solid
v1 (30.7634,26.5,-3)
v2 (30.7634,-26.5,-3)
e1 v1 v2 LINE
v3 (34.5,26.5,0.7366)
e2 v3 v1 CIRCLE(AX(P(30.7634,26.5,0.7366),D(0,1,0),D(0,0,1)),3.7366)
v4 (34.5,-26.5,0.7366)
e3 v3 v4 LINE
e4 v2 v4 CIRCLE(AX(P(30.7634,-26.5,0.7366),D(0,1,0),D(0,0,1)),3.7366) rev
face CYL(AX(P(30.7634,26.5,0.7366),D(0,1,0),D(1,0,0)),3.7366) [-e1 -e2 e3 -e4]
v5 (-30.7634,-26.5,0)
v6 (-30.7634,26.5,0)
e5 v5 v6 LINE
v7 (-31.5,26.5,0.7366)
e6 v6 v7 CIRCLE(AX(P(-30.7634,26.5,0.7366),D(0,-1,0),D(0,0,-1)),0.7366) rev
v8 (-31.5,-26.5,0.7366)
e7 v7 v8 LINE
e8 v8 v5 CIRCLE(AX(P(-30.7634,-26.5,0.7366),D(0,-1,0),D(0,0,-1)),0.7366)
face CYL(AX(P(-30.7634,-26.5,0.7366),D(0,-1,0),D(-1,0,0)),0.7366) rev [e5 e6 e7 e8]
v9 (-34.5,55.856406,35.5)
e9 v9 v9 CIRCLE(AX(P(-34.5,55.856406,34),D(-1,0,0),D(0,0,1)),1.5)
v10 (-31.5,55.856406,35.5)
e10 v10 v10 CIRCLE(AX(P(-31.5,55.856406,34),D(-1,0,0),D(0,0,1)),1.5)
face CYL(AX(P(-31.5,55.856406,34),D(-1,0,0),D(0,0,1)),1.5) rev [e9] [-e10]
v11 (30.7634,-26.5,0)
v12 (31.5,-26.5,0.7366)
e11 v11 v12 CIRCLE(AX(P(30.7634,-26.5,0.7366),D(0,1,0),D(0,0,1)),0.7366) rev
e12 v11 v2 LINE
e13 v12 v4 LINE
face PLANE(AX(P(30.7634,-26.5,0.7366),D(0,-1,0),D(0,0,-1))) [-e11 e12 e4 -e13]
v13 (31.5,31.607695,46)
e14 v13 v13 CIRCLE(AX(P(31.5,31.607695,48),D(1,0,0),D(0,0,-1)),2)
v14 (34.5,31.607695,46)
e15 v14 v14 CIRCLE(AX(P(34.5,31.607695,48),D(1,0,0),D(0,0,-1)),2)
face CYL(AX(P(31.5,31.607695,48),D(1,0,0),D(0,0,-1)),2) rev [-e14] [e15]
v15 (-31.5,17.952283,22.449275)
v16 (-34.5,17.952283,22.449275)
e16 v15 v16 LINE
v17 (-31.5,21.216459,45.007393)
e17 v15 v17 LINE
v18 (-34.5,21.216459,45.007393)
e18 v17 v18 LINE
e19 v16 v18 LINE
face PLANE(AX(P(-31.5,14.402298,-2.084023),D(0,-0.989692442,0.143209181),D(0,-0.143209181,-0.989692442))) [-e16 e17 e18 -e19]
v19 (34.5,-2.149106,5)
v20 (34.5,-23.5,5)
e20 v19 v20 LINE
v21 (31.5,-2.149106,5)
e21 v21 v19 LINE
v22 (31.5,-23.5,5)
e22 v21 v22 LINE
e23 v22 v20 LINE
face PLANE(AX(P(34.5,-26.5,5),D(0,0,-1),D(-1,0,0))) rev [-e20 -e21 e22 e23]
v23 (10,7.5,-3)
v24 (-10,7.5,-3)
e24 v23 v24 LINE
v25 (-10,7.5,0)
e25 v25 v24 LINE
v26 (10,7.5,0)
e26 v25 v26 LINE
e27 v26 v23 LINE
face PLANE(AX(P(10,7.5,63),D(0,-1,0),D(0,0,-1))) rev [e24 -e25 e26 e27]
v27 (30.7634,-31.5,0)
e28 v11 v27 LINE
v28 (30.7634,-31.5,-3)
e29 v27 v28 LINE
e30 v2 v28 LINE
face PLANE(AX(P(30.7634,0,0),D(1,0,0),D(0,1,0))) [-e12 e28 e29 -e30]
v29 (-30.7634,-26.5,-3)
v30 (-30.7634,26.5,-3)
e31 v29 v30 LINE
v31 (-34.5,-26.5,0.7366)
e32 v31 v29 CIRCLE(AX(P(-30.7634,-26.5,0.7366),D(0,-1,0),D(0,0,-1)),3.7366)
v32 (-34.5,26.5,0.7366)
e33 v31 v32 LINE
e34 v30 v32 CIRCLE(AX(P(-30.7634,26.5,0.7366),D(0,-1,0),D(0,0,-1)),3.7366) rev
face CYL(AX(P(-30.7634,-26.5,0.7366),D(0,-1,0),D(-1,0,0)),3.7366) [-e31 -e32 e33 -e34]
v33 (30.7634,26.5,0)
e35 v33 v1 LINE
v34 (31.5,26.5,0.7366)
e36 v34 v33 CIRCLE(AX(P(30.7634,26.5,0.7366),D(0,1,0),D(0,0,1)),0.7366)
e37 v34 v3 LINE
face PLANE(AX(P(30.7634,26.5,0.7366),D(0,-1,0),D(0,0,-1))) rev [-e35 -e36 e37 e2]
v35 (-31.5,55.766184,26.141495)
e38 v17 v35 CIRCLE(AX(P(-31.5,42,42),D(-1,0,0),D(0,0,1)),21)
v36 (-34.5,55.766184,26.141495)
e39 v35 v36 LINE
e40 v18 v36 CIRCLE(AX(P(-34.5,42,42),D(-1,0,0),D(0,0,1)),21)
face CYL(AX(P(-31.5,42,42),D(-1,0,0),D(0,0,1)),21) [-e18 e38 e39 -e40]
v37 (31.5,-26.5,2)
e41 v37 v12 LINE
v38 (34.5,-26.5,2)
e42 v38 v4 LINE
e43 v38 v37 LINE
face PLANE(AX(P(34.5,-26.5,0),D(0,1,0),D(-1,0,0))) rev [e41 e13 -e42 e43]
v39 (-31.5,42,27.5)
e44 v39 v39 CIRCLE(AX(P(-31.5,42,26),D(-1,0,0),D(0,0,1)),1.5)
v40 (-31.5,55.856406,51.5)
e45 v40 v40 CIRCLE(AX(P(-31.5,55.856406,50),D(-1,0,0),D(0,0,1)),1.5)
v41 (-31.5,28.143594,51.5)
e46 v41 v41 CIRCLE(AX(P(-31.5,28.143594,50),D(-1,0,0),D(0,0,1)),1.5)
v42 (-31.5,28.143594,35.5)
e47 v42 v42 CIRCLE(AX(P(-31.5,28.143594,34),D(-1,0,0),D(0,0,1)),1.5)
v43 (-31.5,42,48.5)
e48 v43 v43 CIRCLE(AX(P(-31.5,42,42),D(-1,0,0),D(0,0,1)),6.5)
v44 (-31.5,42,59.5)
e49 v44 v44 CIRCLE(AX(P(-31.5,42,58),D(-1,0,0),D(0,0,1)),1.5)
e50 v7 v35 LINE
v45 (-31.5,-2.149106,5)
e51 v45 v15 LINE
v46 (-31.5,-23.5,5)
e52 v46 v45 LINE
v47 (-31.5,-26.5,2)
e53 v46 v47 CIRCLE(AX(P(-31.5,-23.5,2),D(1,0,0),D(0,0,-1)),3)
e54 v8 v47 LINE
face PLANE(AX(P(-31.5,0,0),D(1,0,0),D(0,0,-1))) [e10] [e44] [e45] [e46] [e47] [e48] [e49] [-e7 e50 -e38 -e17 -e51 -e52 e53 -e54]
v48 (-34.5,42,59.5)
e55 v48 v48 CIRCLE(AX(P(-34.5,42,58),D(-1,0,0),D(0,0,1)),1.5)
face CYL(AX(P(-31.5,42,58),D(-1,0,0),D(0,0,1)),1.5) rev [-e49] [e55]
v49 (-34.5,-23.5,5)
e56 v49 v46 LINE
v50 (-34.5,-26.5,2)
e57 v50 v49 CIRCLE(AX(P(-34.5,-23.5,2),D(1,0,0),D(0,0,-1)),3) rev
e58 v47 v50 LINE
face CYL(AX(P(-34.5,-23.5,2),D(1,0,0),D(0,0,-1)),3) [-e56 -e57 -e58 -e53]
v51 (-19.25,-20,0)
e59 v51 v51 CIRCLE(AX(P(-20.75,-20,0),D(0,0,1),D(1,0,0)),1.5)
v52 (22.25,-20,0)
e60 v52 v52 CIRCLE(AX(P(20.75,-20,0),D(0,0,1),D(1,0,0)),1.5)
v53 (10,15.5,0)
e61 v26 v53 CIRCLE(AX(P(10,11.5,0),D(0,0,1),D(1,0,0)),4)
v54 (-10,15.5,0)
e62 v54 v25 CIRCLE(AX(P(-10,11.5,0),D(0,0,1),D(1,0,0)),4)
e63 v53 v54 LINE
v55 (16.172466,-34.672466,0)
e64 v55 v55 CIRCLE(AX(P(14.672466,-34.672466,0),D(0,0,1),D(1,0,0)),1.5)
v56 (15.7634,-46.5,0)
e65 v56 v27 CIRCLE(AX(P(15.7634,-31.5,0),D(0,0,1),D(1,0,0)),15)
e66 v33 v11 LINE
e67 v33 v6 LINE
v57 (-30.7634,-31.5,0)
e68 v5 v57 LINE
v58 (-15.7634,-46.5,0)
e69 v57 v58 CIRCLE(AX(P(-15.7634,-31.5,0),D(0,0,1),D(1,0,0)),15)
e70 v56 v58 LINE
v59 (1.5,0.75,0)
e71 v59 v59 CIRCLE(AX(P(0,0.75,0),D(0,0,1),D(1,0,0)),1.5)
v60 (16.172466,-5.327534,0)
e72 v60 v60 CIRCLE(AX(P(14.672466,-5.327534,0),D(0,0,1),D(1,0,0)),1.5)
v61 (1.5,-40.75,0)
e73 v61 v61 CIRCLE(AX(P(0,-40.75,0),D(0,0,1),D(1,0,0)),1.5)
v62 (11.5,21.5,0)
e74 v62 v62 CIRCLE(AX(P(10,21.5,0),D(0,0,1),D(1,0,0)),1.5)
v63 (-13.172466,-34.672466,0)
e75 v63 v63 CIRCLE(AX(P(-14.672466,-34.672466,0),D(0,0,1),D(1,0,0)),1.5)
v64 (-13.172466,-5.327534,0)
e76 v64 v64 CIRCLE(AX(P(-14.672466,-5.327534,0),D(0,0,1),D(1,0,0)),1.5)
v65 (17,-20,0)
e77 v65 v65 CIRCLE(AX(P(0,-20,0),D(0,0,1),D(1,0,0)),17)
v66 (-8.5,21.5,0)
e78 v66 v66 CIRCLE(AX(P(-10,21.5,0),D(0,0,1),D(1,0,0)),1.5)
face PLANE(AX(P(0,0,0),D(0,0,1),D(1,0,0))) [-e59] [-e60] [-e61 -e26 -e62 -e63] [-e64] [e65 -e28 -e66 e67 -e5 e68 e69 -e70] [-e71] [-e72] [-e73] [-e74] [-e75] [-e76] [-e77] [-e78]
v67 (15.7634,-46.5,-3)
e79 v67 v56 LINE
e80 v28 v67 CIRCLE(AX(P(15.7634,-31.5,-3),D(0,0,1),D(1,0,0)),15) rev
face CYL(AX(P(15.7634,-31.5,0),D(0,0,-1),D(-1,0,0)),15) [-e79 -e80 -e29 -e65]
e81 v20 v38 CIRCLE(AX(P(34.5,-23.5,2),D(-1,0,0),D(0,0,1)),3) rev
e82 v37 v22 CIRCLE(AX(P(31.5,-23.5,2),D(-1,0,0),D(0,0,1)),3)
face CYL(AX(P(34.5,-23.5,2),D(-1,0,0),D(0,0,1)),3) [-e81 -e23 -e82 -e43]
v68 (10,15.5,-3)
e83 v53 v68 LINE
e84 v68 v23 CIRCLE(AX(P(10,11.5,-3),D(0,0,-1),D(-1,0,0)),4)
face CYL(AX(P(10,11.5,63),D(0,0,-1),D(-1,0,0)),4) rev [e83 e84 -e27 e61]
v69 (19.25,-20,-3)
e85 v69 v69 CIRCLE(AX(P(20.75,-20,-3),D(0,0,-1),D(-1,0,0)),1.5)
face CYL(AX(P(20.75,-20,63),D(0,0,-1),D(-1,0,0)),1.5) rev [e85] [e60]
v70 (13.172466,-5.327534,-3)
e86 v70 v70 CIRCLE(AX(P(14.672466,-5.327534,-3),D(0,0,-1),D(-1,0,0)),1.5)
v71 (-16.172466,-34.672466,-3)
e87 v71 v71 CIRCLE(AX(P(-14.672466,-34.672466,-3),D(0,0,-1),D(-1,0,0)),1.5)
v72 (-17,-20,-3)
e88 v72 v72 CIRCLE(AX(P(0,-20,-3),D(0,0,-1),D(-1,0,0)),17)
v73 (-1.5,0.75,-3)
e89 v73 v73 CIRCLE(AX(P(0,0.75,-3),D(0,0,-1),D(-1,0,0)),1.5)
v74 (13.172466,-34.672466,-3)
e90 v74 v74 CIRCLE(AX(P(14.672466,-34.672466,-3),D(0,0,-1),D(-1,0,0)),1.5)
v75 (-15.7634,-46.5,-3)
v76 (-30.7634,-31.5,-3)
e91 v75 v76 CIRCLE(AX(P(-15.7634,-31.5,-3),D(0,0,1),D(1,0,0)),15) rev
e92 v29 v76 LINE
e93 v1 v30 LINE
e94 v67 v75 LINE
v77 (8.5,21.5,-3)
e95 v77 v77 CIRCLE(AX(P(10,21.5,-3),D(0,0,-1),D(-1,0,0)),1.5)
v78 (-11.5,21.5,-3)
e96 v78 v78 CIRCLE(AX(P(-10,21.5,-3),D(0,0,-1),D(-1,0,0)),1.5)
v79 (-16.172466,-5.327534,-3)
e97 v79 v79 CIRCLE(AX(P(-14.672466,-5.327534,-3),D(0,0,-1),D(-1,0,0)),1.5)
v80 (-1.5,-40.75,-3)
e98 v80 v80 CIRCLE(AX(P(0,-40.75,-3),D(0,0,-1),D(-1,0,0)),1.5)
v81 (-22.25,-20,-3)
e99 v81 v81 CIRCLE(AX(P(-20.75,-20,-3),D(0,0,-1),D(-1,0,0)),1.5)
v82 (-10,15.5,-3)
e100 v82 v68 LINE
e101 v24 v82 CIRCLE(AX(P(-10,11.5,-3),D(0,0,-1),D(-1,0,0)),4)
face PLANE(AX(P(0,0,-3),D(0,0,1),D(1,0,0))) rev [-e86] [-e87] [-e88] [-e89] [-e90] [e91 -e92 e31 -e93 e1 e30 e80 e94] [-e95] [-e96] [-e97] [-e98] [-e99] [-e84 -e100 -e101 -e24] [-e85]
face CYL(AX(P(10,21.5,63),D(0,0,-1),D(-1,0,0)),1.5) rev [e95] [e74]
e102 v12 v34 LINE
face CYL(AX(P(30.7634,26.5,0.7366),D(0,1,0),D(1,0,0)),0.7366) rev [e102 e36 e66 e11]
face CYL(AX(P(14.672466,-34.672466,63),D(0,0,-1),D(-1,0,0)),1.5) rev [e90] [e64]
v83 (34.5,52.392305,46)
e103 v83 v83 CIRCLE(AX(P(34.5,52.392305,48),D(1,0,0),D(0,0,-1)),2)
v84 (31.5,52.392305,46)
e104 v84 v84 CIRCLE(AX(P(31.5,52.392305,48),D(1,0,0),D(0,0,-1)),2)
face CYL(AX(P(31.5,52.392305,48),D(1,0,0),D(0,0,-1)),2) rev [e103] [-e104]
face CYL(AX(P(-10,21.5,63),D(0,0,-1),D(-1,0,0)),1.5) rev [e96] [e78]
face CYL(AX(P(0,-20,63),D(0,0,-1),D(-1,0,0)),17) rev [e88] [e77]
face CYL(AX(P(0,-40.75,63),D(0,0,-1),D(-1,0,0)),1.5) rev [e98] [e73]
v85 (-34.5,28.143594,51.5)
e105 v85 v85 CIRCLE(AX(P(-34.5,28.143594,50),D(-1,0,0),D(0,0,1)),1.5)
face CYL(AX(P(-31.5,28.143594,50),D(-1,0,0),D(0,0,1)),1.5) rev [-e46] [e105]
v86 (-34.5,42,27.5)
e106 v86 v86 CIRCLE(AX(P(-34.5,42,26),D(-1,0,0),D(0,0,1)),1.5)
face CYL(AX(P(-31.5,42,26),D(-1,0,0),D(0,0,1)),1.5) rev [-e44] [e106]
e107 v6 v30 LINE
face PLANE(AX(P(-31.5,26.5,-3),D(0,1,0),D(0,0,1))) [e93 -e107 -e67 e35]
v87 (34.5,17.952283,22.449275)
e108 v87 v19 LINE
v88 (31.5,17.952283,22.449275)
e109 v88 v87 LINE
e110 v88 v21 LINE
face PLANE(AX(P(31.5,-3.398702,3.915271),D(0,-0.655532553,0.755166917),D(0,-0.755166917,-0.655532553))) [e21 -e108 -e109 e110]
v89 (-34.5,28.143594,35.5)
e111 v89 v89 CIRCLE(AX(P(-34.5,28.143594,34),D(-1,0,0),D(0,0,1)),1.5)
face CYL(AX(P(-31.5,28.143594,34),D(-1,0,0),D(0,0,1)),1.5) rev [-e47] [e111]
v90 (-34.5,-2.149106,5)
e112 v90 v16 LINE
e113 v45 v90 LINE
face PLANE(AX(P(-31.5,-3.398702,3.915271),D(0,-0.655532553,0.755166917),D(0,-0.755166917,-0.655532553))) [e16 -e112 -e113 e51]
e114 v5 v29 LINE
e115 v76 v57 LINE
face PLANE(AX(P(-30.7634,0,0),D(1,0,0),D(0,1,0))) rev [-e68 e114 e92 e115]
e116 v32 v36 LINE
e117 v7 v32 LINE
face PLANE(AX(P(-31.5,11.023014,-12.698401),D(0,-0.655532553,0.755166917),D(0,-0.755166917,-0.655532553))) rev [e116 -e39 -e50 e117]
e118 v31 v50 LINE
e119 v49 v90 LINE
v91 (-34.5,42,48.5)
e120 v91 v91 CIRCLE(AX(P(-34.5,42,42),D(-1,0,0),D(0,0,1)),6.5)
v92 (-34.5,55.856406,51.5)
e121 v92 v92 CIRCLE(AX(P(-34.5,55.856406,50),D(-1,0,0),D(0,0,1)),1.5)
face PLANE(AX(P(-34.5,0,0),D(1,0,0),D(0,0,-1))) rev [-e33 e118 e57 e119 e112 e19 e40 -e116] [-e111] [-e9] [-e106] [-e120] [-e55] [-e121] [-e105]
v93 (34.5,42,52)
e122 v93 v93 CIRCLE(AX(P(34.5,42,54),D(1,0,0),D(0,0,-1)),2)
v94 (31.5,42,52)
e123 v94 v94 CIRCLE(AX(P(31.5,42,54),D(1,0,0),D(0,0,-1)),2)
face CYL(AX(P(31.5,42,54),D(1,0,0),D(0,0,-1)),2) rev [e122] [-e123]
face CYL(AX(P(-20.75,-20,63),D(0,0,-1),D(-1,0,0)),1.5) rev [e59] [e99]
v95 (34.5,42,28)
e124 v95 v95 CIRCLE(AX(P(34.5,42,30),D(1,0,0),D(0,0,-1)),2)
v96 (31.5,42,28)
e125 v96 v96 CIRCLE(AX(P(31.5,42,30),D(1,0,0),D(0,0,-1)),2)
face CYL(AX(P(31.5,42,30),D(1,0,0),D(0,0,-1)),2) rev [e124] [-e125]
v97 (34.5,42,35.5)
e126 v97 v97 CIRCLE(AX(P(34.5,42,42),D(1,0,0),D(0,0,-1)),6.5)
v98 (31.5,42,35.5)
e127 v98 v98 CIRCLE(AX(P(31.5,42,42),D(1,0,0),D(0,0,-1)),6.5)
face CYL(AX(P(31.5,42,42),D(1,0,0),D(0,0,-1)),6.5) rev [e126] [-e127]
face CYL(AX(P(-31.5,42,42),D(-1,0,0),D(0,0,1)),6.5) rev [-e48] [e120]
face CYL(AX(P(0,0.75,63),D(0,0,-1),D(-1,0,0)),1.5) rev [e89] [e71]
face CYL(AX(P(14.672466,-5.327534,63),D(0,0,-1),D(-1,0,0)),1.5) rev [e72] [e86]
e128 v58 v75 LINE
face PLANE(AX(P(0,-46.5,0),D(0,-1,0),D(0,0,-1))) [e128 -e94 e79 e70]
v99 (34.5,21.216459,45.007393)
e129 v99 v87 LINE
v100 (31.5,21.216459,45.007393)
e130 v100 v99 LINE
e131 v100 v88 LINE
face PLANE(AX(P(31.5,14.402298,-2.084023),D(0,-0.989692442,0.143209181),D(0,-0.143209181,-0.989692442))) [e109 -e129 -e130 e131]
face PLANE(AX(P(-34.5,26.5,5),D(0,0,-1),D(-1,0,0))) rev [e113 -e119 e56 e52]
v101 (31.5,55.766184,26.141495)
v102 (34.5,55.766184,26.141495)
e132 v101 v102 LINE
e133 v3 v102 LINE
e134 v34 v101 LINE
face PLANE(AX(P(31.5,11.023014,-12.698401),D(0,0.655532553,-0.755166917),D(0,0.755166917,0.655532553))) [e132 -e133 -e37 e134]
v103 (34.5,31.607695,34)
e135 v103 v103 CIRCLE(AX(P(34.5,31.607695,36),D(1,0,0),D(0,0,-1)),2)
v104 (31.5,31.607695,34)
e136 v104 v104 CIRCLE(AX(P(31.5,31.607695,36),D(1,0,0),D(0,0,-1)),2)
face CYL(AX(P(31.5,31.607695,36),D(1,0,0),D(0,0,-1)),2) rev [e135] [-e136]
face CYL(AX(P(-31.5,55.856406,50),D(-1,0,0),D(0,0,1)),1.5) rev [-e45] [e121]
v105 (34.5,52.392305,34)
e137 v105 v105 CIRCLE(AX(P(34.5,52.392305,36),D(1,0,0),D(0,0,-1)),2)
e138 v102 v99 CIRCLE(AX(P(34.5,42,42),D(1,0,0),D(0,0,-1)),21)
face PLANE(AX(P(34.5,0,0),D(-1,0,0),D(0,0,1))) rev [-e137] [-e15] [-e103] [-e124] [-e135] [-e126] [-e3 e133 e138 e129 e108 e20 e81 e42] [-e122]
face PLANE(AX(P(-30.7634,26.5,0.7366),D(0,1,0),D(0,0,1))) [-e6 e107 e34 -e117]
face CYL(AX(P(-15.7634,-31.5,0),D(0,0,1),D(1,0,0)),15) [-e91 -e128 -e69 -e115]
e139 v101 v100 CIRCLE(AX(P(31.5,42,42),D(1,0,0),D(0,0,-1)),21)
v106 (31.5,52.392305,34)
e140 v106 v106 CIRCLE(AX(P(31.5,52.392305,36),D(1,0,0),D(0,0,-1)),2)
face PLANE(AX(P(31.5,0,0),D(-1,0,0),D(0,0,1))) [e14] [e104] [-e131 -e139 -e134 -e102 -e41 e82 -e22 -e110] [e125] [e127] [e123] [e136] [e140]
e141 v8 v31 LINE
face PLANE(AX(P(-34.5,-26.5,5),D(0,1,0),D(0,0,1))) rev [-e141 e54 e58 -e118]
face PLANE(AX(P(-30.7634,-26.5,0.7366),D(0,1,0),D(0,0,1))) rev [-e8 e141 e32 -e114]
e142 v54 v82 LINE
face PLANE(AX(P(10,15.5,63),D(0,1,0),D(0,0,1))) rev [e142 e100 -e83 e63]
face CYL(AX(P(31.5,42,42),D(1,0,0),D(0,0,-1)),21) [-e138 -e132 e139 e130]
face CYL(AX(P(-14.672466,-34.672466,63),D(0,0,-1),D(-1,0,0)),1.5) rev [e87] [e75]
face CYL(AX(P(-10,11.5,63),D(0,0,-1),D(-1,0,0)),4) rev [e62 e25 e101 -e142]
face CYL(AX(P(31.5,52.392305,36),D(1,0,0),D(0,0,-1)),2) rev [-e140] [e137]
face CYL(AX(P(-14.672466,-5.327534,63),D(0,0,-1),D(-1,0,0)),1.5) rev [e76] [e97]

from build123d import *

# Parameters (mm, degrees)
SKETCH_1_W                         = 63
SKETCH_1_H                         = 53
SM_BASE_FLANGE_1_DEPTH             = 3
SM_EDGE_FLANGE_1_STRIP_W           = 13.4732
SM_EDGE_FLANGE_1_STRIP_H           = 3
SM_EDGE_FLANGE_1_STRIP_CUT_DEPTH   = 53
SM_EDGE_FLANGE_1_STRIP_2_W         = 13.4732
SM_EDGE_FLANGE_1_STRIP_2_H         = 3
SM_EDGE_FLANGE_1_STRIP_CUT_2_DEPTH = 53
SM_EDGE_FLANGE_1_DEPTH             = 53
SM_EDGE_FLANGE_1_BEND_DEPTH        = 53
SKETCH_16_R                        = 1.5
SKETCH_16_R_2                      = 6.5
EXTRUDE_1_DEPTH                    = 3
EXTRUDE_START                      = -3
SKETCH_21_R                        = 2
SKETCH_21_R_2                      = 6.5
EXTRUDE_5_DEPTH                    = 3
EXTRUDE_6_DEPTH                    = 3
SKETCH_23_W                        = 61.5268
SKETCH_23_H                        = 20
EXTRUDE_7_DEPTH                    = 3
SKETCH_17_R                        = 1.5
SKETCH_17_R_2                      = 17
CUT_EXTRUDE_1_DEPTH                = 98.546142927
FILLET_2_R                         = 15
FILLET_3_R                         = 3
SKETCH_24_R                        = 1.5
CUT_EXTRUDE_2_DEPTH                = 98.546142927


# Sheet-metal steps are written as plain solids
with BuildPart() as part:
    # Sketch 1 → 基体-法兰1 (new body)
    with BuildSketch(Plane.XY):
        Rectangle(SKETCH_1_W, SKETCH_1_H)
    extrude(amount=-SM_BASE_FLANGE_1_DEPTH)

    # 边线-法兰1 strip (across the edge) → 边线-法兰1 strip cut (cut)
    with BuildSketch(Plane(origin=(-31.5, 26.5, 0), x_dir=(1, 0, 0), z_dir=(0, -1, 0))):
        with Locations((-6, -1.5)):
            Rectangle(SM_EDGE_FLANGE_1_STRIP_W, SM_EDGE_FLANGE_1_STRIP_H)
    extrude(amount=SM_EDGE_FLANGE_1_STRIP_CUT_DEPTH, mode=Mode.SUBTRACT)

    # 边线-法兰1 strip 2 (across the edge) → 边线-法兰1 strip cut 2 (cut)
    with BuildSketch(Plane(origin=(31.5, -26.5, 0), x_dir=(-1, 0, 0), z_dir=(0, 1, 0))):
        with Locations((-6, -1.5)):
            Rectangle(SM_EDGE_FLANGE_1_STRIP_2_W, SM_EDGE_FLANGE_1_STRIP_2_H)
    extrude(amount=SM_EDGE_FLANGE_1_STRIP_CUT_2_DEPTH, mode=Mode.SUBTRACT)

    # 边线-法兰1 section (across the edge) → 边线-法兰1 (add)
    with BuildSketch(Plane(origin=(-31.5, 26.5, 0), x_dir=(1, 0, 0), z_dir=(0, -1, 0))):
        with BuildLine():
            Line((-3, 0.7366), (-3, 5))
            Line((-3, 5), (0, 5))
            Line((0, 5), (0, 0.7366))
            ThreePointArc((0, 0.7366), (0.215745145, 0.215745145), (0.7366, 0))
            Line((0.7366, 0), (0.7366, -3))
            ThreePointArc((0.7366, -3), (-1.905575199, -1.905575199), (-3, 0.7366))
        make_face()
    extrude(amount=SM_EDGE_FLANGE_1_DEPTH)

    # 边线-法兰1 section 2 (across the edge) → 边线-法兰1 bend (add)
    with BuildSketch(Plane(origin=(31.5, -26.5, 0), x_dir=(-1, 0, 0), z_dir=(0, 1, 0))):
        with BuildLine():
            Line((-3, 0.7366), (-3, 5))
            Line((-3, 5), (0, 5))
            Line((0, 5), (0, 0.7366))
            ThreePointArc((0, 0.7366), (0.215745145, 0.215745145), (0.7366, 0))
            Line((0.7366, 0), (0.7366, -3))
            ThreePointArc((0.7366, -3), (-1.905575199, -1.905575199), (-3, 0.7366))
        make_face()
    extrude(amount=SM_EDGE_FLANGE_1_BEND_DEPTH)

    # 草图16 → 凸台-拉伸1 (add)
    with BuildSketch(Plane.ZY.offset(34.5)):
        with BuildLine():
            Line((26.141494742, 55.766183603), (0.7366, 26.5))
            Line((0.7366, 26.5), (5, 26.5))
            Line((5, 26.5), (5, -2.149105668))
            Line((5, -2.149105668), (29.00460009, 25.503952559))
            ThreePointArc((29.00460009, 25.503952559), (62.906640519, 43.977974267), (26.141494742, 55.766183603))
        make_face()
        with Locations((50, 55.856406461)):
            Circle(SKETCH_16_R, mode=Mode.SUBTRACT)
        with Locations((26, 42)):
            Circle(SKETCH_16_R, mode=Mode.SUBTRACT)
        with Locations((34, 28.143593539)):
            Circle(SKETCH_16_R, mode=Mode.SUBTRACT)
        with Locations((50, 28.143593539)):
            Circle(SKETCH_16_R, mode=Mode.SUBTRACT)
        with Locations((42, 42)):
            Circle(SKETCH_16_R_2, mode=Mode.SUBTRACT)
        with Locations((34, 55.856406461)):
            Circle(SKETCH_16_R, mode=Mode.SUBTRACT)
        with Locations((58, 42)):
            Circle(SKETCH_16_R, mode=Mode.SUBTRACT)
    extrude(amount=-EXTRUDE_1_DEPTH)

    # 草图21 → 凸台-拉伸5 (add)
    # profile 1 of 2: a face of its own
    with BuildSketch(Plane(origin=(34.5, 0, 0), x_dir=(0, 0, -1), z_dir=(1, 0, 0)).offset(EXTRUDE_START)):
        with BuildLine():
            ThreePointArc((-26.141494742, 55.766183603), (-60.431186758, 52.06436062), (-45.007392809, 21.216458711))
            ThreePointArc((-45.007392809, 21.216458711), (-36.565322242, 21.715417735), (-29.00460009, 25.503952559))
            Line((-29.00460009, 25.503952559), (-22.449274565, 17.952283389))
            Line((-22.449274565, 17.952283389), (-5, -2.149105668))
            Line((-5, -2.149105668), (-5, 26.5))
            Line((-5, 26.5), (-0.7366, 26.5))
            Line((-0.7366, 26.5), (-26.141494742, 55.766183603))
        make_face()
        with Locations((-48, 31.607695155)):
            Circle(SKETCH_21_R, mode=Mode.SUBTRACT)
        with Locations((-36, 31.607695155)):
            Circle(SKETCH_21_R, mode=Mode.SUBTRACT)
        with Locations((-54, 42)):
            Circle(SKETCH_21_R, mode=Mode.SUBTRACT)
        with Locations((-48, 52.392304845)):
            Circle(SKETCH_21_R, mode=Mode.SUBTRACT)
        with Locations(Location((-42, 42, 0), (0, 0, 180))):
            Circle(SKETCH_21_R_2, mode=Mode.SUBTRACT)
        with Locations((-36, 52.392304845)):
            Circle(SKETCH_21_R, mode=Mode.SUBTRACT)
        with Locations((-30, 42)):
            Circle(SKETCH_21_R, mode=Mode.SUBTRACT)
    # profile 2 of 2: a face of its own
    with BuildSketch(Plane(origin=(34.5, 0, 0), x_dir=(0, 0, -1), z_dir=(1, 0, 0)).offset(EXTRUDE_START)):
        with BuildLine():
            ThreePointArc((-29.00460009, 25.503952559), (-36.565322242, 21.715417735), (-45.007392809, 21.216458711))
            Line((-45.007392809, 21.216458711), (-22.449274565, 17.952283389))
            Line((-22.449274565, 17.952283389), (-29.00460009, 25.503952559))
        make_face()
    extrude(amount=EXTRUDE_5_DEPTH)

    # 草图22 → 凸台-拉伸6 (add)
    with BuildSketch(Plane.ZY.offset(34.5)):
        with BuildLine():
            Line((22.449274565, 17.952283389), (45.007392809, 21.216458711))
            ThreePointArc((45.007392809, 21.216458711), (36.565322242, 21.715417735), (29.00460009, 25.503952559))
            Line((29.00460009, 25.503952559), (22.449274565, 17.952283389))
        make_face()
    extrude(amount=-EXTRUDE_6_DEPTH)

    # 草图23 → 凸台-拉伸7 (add)
    with BuildSketch(Plane(origin=(0, 0, -3), x_dir=(-1, 0, 0), z_dir=(0, 0, -1))):
        with Locations((0, -36.5)):
            Rectangle(SKETCH_23_W, SKETCH_23_H)
    extrude(amount=-EXTRUDE_7_DEPTH)

    # 草图17 → 切除-拉伸1 (cut, through all)
    with BuildSketch(Plane(origin=(0, 0, -3), x_dir=(-1, 0, 0), z_dir=(0, 0, -1))):
        with Locations((0, 0.75)):
            Circle(SKETCH_17_R)
        with Locations((0, -20)):
            Circle(SKETCH_17_R_2)
        with Locations((14.67246571, -5.32753429)):
            Circle(SKETCH_17_R)
        with Locations((20.75, -20)):
            Circle(SKETCH_17_R)
        with Locations((14.67246571, -34.67246571)):
            Circle(SKETCH_17_R)
        with Locations((0, -40.75)):
            Circle(SKETCH_17_R)
        with Locations((-14.67246571, -34.67246571)):
            Circle(SKETCH_17_R)
        with Locations((-20.75, -20)):
            Circle(SKETCH_17_R)
        with Locations((-14.67246571, -5.32753429)):
            Circle(SKETCH_17_R)
    extrude(amount=-CUT_EXTRUDE_1_DEPTH, mode=Mode.SUBTRACT)

    # 圆角2
    fillet_2_edges = [part.edges().sort_by_distance(p)[0] for p in [
        (-30.7634, -46.5, -1.5),
        (30.7634, -46.5, -1.5),
    ]]
    fillet(fillet_2_edges, radius=FILLET_2_R)

    # 圆角3
    fillet_3_edges = [part.edges().sort_by_distance(p)[0] for p in [
        (-33, -26.5, 5),
        (33, -26.5, 5),
    ]]
    fillet(fillet_3_edges, radius=FILLET_3_R)

    # 草图24 → 切除-拉伸2 (cut, through all)
    with BuildSketch(Plane(origin=(0, 0, -3), x_dir=(-1, 0, 0), z_dir=(0, 0, -1))):
        with Locations((10, 21.5)):
            Circle(SKETCH_24_R)
        with Locations((-10, 21.5)):
            Circle(SKETCH_24_R)
        with BuildLine():
            Line((-10, 15.5), (10, 15.5))
            ThreePointArc((10, 15.5), (14, 11.5), (10, 7.5))
            Line((10, 7.5), (-10, 7.5))
            ThreePointArc((-10, 7.5), (-14, 11.5), (-10, 15.5))
        make_face()
    extrude(amount=-CUT_EXTRUDE_2_DEPTH, mode=Mode.SUBTRACT)


solid = part.part
